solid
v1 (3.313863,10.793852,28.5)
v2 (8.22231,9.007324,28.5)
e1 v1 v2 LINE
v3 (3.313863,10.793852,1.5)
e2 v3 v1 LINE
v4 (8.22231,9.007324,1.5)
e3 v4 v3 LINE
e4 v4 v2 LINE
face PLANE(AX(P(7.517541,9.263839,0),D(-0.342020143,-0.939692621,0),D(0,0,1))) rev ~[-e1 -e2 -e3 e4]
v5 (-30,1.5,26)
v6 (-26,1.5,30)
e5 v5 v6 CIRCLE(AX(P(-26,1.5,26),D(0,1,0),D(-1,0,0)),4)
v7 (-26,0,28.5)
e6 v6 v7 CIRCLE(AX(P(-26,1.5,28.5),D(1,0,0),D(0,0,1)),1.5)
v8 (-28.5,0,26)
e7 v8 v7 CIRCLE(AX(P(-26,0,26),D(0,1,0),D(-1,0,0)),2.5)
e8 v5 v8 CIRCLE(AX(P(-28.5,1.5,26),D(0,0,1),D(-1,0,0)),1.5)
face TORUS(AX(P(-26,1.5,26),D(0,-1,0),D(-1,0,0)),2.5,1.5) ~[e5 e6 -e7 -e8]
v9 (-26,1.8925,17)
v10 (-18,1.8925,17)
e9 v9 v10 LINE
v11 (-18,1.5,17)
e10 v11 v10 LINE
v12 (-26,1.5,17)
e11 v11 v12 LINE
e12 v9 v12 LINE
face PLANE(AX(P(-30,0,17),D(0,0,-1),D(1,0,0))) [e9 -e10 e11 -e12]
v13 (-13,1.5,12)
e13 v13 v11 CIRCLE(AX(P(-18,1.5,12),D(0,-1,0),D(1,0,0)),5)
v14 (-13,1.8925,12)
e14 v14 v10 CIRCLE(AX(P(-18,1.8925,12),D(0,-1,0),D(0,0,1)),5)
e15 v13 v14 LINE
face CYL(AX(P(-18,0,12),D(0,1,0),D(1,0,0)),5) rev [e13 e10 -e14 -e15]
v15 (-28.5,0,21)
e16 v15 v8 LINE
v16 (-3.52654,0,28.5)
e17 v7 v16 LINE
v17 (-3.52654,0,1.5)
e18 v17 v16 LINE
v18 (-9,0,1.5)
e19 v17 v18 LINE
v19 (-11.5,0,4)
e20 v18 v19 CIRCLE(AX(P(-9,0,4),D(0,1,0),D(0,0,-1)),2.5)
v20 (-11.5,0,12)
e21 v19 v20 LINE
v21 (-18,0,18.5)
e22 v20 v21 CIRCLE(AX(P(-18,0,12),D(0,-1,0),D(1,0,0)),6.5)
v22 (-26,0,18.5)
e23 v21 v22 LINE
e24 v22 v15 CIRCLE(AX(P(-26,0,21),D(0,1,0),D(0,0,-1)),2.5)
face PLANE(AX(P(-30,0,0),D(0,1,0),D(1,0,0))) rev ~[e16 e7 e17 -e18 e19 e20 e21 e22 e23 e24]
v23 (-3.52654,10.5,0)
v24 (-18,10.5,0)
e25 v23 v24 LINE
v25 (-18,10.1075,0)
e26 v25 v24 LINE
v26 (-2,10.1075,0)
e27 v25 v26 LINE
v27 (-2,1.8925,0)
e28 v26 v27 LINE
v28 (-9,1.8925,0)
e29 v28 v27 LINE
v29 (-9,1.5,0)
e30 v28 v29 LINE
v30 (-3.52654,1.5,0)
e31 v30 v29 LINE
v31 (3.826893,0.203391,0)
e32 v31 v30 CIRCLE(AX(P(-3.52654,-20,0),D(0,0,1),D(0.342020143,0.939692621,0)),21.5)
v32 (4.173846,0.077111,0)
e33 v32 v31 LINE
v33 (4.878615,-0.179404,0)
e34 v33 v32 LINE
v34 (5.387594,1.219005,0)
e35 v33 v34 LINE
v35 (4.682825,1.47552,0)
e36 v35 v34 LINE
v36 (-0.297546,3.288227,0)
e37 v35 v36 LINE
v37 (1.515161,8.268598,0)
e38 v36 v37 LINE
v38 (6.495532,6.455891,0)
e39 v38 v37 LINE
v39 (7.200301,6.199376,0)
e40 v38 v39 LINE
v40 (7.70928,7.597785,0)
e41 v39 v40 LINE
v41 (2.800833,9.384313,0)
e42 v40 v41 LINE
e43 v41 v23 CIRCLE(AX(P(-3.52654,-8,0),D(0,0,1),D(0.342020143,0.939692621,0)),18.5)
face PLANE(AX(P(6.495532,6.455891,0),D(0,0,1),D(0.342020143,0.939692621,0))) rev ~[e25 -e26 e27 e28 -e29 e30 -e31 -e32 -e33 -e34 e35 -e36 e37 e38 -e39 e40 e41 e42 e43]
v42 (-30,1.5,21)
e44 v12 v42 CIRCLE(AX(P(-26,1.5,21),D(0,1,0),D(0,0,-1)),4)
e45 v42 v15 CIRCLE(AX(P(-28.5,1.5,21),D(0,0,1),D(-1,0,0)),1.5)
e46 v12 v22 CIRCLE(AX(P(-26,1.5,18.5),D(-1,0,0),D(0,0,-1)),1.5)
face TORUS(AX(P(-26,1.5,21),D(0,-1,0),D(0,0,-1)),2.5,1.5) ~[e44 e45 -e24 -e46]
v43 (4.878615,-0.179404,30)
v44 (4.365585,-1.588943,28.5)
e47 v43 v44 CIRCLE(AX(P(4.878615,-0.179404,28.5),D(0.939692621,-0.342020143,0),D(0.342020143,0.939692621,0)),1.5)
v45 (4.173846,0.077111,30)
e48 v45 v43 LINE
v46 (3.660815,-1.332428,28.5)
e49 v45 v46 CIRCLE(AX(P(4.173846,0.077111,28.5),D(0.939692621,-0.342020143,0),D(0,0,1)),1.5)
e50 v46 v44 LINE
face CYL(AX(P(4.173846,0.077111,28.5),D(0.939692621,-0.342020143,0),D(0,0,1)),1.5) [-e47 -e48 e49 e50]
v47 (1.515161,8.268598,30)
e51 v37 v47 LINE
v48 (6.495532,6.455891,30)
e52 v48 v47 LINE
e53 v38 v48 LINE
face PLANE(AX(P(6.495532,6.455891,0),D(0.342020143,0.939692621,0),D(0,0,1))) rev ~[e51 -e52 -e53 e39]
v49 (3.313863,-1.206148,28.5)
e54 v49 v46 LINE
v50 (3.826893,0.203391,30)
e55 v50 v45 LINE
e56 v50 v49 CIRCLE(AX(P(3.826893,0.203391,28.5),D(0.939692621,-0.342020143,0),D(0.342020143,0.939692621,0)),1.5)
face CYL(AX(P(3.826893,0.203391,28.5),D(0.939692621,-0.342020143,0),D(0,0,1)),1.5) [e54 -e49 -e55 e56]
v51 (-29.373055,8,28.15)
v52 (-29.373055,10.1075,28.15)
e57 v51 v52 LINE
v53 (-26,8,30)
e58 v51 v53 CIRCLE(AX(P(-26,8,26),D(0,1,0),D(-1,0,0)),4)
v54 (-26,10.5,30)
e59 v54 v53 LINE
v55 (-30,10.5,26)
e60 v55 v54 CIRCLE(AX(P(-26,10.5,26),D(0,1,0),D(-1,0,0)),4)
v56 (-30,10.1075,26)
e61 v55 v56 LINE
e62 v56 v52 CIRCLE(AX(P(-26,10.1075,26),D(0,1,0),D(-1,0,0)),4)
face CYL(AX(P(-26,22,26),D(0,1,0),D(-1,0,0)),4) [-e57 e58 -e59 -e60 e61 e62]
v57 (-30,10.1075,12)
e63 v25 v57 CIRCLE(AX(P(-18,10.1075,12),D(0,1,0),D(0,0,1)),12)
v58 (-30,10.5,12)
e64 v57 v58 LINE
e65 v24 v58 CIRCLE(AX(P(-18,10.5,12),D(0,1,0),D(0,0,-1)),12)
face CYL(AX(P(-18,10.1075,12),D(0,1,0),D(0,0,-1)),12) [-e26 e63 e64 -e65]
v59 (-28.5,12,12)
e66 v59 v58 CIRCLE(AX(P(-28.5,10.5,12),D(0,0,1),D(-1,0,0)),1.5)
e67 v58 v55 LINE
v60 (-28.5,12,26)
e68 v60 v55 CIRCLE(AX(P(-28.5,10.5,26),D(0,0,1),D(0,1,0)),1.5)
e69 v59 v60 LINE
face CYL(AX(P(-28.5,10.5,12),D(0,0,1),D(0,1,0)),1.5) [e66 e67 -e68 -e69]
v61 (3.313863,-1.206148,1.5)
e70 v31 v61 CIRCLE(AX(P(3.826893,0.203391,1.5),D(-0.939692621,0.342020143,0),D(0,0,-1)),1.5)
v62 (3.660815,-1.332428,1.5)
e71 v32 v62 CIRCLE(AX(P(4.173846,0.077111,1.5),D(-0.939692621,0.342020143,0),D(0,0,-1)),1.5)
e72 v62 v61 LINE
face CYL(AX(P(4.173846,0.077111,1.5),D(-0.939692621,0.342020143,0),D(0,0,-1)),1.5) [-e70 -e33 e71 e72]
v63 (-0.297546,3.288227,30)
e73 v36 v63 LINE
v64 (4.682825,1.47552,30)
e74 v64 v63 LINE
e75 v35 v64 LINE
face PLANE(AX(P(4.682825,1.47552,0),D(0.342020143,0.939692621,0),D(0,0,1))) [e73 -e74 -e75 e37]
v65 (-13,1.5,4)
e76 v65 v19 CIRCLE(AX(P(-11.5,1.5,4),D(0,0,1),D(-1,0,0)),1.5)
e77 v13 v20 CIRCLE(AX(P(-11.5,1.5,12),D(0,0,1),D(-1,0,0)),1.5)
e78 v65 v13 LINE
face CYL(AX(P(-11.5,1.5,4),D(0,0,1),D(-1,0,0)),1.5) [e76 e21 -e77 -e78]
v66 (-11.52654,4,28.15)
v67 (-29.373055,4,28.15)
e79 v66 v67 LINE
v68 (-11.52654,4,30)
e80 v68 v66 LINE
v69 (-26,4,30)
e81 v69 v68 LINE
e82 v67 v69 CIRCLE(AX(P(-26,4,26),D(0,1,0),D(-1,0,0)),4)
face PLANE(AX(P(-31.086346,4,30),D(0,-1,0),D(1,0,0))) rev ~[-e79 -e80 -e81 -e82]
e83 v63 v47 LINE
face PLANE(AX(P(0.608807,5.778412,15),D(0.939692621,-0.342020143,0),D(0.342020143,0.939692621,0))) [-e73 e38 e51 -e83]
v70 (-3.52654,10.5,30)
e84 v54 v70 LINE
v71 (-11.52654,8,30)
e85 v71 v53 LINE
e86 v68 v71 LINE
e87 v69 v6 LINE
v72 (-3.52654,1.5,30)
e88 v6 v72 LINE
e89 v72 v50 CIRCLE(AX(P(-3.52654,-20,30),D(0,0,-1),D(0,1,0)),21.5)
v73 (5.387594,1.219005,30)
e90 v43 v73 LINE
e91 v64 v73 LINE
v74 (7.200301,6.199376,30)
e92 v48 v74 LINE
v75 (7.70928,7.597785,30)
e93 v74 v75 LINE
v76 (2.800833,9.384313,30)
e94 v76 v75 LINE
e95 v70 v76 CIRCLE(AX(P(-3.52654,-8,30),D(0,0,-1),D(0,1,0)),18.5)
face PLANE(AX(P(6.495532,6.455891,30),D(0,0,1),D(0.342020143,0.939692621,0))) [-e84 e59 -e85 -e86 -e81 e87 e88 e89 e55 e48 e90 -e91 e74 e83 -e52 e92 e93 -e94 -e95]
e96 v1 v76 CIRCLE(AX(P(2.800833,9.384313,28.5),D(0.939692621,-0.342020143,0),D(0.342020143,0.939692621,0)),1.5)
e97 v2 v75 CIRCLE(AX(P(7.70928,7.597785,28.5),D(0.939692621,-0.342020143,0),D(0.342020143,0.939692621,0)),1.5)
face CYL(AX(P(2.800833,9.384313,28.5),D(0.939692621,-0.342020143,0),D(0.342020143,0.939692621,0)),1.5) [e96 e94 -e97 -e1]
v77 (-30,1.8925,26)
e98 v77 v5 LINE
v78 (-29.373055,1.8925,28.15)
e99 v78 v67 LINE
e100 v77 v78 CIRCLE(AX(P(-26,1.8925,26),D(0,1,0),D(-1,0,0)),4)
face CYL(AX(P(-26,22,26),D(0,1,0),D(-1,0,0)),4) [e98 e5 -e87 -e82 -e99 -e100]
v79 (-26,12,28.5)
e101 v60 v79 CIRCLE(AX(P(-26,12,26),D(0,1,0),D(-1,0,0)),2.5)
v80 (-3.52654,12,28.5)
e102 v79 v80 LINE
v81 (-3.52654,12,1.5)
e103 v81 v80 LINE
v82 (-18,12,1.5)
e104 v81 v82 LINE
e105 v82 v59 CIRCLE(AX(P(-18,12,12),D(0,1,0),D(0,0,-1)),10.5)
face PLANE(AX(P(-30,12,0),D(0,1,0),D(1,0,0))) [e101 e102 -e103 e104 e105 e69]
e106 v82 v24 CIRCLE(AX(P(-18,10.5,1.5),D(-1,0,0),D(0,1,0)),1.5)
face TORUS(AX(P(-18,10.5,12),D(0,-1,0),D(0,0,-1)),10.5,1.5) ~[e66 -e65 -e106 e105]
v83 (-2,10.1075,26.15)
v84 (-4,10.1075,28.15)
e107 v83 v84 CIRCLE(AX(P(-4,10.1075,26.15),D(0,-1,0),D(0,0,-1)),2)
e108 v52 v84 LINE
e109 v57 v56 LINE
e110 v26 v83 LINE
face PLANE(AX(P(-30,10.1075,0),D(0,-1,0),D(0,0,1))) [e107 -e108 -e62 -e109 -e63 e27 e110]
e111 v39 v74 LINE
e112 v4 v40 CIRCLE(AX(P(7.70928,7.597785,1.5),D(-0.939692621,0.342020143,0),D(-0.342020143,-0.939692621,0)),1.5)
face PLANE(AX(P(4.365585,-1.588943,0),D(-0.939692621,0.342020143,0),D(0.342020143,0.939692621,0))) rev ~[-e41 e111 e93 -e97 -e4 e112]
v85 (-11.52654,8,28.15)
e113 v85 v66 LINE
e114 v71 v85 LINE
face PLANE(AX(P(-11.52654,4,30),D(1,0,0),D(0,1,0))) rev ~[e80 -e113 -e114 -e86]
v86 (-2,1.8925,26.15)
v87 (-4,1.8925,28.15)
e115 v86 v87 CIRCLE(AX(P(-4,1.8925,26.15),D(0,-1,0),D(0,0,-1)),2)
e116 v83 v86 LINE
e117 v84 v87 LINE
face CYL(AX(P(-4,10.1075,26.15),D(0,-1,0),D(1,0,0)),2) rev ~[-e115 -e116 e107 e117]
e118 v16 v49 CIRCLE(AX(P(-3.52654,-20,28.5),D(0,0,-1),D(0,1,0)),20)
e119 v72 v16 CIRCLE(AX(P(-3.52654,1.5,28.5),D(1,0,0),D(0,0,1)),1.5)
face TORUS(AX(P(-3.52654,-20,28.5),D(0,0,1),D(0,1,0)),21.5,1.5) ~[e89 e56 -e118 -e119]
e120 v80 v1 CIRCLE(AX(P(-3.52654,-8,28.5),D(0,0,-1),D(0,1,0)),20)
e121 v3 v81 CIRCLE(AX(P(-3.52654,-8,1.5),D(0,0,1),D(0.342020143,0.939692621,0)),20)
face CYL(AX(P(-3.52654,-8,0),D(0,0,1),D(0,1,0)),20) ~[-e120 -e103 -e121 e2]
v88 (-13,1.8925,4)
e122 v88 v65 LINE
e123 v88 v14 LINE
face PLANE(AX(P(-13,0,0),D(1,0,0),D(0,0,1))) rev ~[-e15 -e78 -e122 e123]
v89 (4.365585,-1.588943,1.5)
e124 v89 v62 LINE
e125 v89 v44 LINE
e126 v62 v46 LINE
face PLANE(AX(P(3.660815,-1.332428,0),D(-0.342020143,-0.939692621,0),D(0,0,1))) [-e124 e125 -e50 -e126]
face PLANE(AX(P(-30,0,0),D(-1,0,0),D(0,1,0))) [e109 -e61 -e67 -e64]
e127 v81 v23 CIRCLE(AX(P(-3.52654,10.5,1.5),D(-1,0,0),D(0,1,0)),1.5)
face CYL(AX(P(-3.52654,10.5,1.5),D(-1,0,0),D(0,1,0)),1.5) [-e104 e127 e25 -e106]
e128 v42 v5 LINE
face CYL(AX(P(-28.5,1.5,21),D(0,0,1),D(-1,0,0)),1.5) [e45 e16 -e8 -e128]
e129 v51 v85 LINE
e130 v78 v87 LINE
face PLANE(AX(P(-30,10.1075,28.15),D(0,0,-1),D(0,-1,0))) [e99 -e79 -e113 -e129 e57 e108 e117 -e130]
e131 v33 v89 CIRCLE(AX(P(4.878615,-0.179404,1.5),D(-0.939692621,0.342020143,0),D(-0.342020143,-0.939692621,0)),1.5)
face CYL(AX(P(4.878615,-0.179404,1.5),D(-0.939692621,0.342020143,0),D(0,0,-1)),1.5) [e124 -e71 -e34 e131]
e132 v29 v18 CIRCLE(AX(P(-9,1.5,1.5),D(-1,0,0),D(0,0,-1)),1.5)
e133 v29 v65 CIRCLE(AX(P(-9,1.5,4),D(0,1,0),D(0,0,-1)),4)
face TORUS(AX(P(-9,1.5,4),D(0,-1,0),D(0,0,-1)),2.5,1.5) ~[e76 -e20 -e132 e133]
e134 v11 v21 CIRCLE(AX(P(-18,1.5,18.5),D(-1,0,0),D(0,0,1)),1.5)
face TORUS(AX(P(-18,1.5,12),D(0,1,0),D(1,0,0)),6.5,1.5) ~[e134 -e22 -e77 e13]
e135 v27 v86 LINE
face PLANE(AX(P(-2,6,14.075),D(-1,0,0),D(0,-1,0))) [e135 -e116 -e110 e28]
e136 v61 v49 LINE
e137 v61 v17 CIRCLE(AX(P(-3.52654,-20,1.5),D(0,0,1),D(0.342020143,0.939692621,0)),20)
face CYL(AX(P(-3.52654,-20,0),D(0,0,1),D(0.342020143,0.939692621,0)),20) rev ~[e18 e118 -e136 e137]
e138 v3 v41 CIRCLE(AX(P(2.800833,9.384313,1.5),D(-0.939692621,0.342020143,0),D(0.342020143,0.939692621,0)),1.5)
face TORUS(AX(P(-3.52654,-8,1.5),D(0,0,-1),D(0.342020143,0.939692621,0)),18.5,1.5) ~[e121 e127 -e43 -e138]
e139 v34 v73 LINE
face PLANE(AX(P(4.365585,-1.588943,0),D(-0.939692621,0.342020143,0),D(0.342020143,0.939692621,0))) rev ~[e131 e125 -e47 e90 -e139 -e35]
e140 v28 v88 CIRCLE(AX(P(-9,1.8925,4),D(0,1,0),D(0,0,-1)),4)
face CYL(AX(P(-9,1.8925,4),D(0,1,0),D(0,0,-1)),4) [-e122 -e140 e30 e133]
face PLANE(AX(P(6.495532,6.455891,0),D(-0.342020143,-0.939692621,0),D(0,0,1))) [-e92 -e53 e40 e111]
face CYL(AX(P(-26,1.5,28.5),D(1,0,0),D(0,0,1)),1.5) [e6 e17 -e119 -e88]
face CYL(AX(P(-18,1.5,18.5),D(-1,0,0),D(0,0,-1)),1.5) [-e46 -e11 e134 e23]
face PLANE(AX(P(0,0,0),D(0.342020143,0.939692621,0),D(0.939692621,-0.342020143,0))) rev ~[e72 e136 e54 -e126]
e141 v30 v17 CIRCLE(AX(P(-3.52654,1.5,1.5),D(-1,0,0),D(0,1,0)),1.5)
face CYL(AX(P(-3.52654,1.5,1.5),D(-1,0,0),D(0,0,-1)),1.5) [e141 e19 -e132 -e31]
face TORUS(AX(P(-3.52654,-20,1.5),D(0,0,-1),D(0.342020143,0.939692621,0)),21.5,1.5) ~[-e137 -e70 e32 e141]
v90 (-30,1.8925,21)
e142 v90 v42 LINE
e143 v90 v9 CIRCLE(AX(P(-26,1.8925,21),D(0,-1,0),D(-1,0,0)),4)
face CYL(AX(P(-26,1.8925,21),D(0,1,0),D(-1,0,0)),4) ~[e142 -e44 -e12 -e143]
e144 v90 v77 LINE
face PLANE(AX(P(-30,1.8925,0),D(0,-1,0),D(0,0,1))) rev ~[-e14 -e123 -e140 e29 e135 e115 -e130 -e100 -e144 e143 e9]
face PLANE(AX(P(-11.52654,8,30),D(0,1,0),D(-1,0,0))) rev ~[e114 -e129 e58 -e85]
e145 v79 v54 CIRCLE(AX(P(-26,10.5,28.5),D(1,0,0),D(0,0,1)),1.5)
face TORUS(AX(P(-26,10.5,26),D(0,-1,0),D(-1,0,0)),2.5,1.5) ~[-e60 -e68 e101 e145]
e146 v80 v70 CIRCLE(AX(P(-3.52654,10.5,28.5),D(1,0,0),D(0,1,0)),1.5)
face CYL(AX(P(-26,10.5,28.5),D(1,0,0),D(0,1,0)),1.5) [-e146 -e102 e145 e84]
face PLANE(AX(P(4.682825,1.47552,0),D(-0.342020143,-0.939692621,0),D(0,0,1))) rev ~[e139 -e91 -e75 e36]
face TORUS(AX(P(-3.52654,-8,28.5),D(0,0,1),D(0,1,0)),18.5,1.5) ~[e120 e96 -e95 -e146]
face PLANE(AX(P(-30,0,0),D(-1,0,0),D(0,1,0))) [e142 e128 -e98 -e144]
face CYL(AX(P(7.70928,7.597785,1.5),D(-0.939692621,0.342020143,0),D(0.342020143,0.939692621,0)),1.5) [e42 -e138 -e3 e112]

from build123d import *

# Parameters (mm, degrees)
F0_W         = 30
F0_H         = 12
F1_DEPTH     = 30
F2_W         = 8.215
F2_H         = 28.15
F3_DEPTH     = 28
F4_W         = 5.3
F4_H         = 30
F5_DEPTH     = 5.3
F6_W         = 17
F6_H         = 17
F7_DEPTH     = 2.8
F8_DEPTH     = 0.75
F9_R         = 12
F10_T1_DEPTH = 32
F10_T3_DEPTH = 11.8925
F11_R        = 20
F12_R        = 5
F13_R        = 1.5
F14_R        = 2
F15_W        = 5.0863461345
F15_H        = 4
F15_W_2      = 14.4734603858
F16_DEPTH    = 30.0010001


# Not quite as in the source:
# - a fillet or chamfer that OpenCascade refuses, or shapes differently, is made with other operations: its cross-section is extruded or revolved along the edge and cut away or added


with BuildPart() as f1:
    # F0 (on Top) → F1 (new body)
    with BuildSketch(Plane.XY):
        with Locations((-15, 6)):
            Rectangle(F0_W, F0_H)
        Polygon((0, 12), (0, 0), (3.6608153082, -1.3324278053), (7.5175409663, 9.2638388534), align=None)
    extrude(amount=F1_DEPTH)

    # F2 (on face) → F3 (cut)
    with BuildSketch(Plane(origin=(-30, 0, 0), x_dir=(0, -1, 0), z_dir=(-1, 0, 0))):
        with Locations((-6, 14.075)):
            Rectangle(F2_W, F2_H)
    extrude(amount=-F3_DEPTH, mode=Mode.SUBTRACT)

    # F4 (on face) → F5 (cut)
    with BuildSketch(Plane(origin=(3.6608153082, -1.3324278053, 0), x_dir=(0.3420201433, 0.9396926208, 0), z_dir=(0.9396926208, -0.3420201433, 0))):
        with Locations((5.6381557247, 15)):
            Rectangle(F4_W, F4_H)
    extrude(amount=-F5_DEPTH, mode=Mode.SUBTRACT)

    # F6 (on face) → F7 (cut)
    with BuildSketch(Plane.XZ):
        with Locations((-21.5, 8.5)):
            Rectangle(F6_W, F6_H)
    extrude(amount=-F7_DEPTH, mode=Mode.SUBTRACT)

    # F8 (add): faces of the model
    f8_faces = [f1.faces().sort_by_distance(p)[0] for p in [
        (7.0065362417, 7.8598649113, 15),
        (4.1718200328, 0.0715461368, 15),
    ]]
    extrude(f8_faces, amount=F8_DEPTH)

    # F9
    f9_edges = [f1.edges().sort_by_distance(p)[0] for p in [
        (-30, 11.05375, 0),
    ]]
    fillet(f9_edges, radius=F9_R)

    # F10: fillet of radius 4 on 3 edges, made by hand

    # F10_s2 → F10_t1 (cut)
    with BuildSketch(Plane.XZ.offset(-22)):
        with BuildLine():
            ThreePointArc((-30, 26), (-28.8284271247, 28.8284271247), (-26, 30))
            Line((-26, 30), (-30, 30))
            Line((-30, 30), (-30, 26))
        make_face()
    extrude(amount=F10_T1_DEPTH, mode=Mode.SUBTRACT)

    # F10_s4 → F10_t3 (cut)
    with BuildSketch(Plane.XZ.offset(-1.8925)):
        with BuildLine():
            ThreePointArc((-30, 21), (-28.8284271247, 18.1715728753), (-26, 17))
            Line((-26, 17), (-30, 17))
            Line((-30, 17), (-30, 21))
        make_face()
        with BuildLine():
            ThreePointArc((-9, 0), (-11.8284271247, 1.1715728753), (-13, 4))
            Line((-13, 4), (-13, 0))
            Line((-13, 0), (-9, 0))
        make_face()
    extrude(amount=F10_T3_DEPTH, mode=Mode.SUBTRACT)

    # F11
    f11_edges = [f1.edges().sort_by_distance(p)[0] for p in [
        (0, 12, 15),
        (0, 0, 15),
    ]]
    fillet(f11_edges, radius=F11_R)

    # F12
    f12_edges = [f1.edges().sort_by_distance(p)[0] for p in [
        (-13, 0.94625, 17),
    ]]
    fillet(f12_edges, radius=F12_R)

    # F13
    f13_edges = [f1.edges().sort_by_distance(p)[0] for p in [
        (-14.464466, 0, 15.535534),
        (-22, 0, 17),
        (-28.828427, 0, 28.828427),
        (-14.76327, 0, 30),
        (-0.053576, -0.303845, 30),
        (3.839724, -1.397545, 30),
        (3.839724, -1.397545, 0),
        (-0.053576, -0.303845, 0),
        (-6.26327, 0, 0),
        (-11.828427, 0, 1.171573),
        (-13, 0, 8),
        (-14.76327, 12, 30),
        (-0.053576, 11.696155, 30),
        (-28.828427, 0, 18.171573),
        (-30, 0, 23.5),
        (-10.76327, 12, 0),
        (-0.053576, 11.696155, 0),
        (5.768087, 9.900588, 0),
        (5.768087, 9.900588, 30),
        (-28.828427, 12, 28.828427),
        (-30, 12, 19),
        (-26.485281, 12, 3.514719),
    ]]
    fillet(f13_edges, radius=F13_R)

    # F14
    f14_edges = [f1.edges().sort_by_distance(p)[0] for p in [
        (-2, 6, 28.15),
    ]]
    fillet(f14_edges, radius=F14_R)

    # F15 (on face) → F16 (cut, through all)
    with BuildSketch(Plane.XY.offset(30)):
        with Locations((-28.5431730673, 6)):
            Rectangle(F15_W, F15_H)
        with Locations((-18.7632698071, 6)):
            Rectangle(F15_W_2, F15_H)
    extrude(amount=-F16_DEPTH, mode=Mode.SUBTRACT)


solid = f1.part
